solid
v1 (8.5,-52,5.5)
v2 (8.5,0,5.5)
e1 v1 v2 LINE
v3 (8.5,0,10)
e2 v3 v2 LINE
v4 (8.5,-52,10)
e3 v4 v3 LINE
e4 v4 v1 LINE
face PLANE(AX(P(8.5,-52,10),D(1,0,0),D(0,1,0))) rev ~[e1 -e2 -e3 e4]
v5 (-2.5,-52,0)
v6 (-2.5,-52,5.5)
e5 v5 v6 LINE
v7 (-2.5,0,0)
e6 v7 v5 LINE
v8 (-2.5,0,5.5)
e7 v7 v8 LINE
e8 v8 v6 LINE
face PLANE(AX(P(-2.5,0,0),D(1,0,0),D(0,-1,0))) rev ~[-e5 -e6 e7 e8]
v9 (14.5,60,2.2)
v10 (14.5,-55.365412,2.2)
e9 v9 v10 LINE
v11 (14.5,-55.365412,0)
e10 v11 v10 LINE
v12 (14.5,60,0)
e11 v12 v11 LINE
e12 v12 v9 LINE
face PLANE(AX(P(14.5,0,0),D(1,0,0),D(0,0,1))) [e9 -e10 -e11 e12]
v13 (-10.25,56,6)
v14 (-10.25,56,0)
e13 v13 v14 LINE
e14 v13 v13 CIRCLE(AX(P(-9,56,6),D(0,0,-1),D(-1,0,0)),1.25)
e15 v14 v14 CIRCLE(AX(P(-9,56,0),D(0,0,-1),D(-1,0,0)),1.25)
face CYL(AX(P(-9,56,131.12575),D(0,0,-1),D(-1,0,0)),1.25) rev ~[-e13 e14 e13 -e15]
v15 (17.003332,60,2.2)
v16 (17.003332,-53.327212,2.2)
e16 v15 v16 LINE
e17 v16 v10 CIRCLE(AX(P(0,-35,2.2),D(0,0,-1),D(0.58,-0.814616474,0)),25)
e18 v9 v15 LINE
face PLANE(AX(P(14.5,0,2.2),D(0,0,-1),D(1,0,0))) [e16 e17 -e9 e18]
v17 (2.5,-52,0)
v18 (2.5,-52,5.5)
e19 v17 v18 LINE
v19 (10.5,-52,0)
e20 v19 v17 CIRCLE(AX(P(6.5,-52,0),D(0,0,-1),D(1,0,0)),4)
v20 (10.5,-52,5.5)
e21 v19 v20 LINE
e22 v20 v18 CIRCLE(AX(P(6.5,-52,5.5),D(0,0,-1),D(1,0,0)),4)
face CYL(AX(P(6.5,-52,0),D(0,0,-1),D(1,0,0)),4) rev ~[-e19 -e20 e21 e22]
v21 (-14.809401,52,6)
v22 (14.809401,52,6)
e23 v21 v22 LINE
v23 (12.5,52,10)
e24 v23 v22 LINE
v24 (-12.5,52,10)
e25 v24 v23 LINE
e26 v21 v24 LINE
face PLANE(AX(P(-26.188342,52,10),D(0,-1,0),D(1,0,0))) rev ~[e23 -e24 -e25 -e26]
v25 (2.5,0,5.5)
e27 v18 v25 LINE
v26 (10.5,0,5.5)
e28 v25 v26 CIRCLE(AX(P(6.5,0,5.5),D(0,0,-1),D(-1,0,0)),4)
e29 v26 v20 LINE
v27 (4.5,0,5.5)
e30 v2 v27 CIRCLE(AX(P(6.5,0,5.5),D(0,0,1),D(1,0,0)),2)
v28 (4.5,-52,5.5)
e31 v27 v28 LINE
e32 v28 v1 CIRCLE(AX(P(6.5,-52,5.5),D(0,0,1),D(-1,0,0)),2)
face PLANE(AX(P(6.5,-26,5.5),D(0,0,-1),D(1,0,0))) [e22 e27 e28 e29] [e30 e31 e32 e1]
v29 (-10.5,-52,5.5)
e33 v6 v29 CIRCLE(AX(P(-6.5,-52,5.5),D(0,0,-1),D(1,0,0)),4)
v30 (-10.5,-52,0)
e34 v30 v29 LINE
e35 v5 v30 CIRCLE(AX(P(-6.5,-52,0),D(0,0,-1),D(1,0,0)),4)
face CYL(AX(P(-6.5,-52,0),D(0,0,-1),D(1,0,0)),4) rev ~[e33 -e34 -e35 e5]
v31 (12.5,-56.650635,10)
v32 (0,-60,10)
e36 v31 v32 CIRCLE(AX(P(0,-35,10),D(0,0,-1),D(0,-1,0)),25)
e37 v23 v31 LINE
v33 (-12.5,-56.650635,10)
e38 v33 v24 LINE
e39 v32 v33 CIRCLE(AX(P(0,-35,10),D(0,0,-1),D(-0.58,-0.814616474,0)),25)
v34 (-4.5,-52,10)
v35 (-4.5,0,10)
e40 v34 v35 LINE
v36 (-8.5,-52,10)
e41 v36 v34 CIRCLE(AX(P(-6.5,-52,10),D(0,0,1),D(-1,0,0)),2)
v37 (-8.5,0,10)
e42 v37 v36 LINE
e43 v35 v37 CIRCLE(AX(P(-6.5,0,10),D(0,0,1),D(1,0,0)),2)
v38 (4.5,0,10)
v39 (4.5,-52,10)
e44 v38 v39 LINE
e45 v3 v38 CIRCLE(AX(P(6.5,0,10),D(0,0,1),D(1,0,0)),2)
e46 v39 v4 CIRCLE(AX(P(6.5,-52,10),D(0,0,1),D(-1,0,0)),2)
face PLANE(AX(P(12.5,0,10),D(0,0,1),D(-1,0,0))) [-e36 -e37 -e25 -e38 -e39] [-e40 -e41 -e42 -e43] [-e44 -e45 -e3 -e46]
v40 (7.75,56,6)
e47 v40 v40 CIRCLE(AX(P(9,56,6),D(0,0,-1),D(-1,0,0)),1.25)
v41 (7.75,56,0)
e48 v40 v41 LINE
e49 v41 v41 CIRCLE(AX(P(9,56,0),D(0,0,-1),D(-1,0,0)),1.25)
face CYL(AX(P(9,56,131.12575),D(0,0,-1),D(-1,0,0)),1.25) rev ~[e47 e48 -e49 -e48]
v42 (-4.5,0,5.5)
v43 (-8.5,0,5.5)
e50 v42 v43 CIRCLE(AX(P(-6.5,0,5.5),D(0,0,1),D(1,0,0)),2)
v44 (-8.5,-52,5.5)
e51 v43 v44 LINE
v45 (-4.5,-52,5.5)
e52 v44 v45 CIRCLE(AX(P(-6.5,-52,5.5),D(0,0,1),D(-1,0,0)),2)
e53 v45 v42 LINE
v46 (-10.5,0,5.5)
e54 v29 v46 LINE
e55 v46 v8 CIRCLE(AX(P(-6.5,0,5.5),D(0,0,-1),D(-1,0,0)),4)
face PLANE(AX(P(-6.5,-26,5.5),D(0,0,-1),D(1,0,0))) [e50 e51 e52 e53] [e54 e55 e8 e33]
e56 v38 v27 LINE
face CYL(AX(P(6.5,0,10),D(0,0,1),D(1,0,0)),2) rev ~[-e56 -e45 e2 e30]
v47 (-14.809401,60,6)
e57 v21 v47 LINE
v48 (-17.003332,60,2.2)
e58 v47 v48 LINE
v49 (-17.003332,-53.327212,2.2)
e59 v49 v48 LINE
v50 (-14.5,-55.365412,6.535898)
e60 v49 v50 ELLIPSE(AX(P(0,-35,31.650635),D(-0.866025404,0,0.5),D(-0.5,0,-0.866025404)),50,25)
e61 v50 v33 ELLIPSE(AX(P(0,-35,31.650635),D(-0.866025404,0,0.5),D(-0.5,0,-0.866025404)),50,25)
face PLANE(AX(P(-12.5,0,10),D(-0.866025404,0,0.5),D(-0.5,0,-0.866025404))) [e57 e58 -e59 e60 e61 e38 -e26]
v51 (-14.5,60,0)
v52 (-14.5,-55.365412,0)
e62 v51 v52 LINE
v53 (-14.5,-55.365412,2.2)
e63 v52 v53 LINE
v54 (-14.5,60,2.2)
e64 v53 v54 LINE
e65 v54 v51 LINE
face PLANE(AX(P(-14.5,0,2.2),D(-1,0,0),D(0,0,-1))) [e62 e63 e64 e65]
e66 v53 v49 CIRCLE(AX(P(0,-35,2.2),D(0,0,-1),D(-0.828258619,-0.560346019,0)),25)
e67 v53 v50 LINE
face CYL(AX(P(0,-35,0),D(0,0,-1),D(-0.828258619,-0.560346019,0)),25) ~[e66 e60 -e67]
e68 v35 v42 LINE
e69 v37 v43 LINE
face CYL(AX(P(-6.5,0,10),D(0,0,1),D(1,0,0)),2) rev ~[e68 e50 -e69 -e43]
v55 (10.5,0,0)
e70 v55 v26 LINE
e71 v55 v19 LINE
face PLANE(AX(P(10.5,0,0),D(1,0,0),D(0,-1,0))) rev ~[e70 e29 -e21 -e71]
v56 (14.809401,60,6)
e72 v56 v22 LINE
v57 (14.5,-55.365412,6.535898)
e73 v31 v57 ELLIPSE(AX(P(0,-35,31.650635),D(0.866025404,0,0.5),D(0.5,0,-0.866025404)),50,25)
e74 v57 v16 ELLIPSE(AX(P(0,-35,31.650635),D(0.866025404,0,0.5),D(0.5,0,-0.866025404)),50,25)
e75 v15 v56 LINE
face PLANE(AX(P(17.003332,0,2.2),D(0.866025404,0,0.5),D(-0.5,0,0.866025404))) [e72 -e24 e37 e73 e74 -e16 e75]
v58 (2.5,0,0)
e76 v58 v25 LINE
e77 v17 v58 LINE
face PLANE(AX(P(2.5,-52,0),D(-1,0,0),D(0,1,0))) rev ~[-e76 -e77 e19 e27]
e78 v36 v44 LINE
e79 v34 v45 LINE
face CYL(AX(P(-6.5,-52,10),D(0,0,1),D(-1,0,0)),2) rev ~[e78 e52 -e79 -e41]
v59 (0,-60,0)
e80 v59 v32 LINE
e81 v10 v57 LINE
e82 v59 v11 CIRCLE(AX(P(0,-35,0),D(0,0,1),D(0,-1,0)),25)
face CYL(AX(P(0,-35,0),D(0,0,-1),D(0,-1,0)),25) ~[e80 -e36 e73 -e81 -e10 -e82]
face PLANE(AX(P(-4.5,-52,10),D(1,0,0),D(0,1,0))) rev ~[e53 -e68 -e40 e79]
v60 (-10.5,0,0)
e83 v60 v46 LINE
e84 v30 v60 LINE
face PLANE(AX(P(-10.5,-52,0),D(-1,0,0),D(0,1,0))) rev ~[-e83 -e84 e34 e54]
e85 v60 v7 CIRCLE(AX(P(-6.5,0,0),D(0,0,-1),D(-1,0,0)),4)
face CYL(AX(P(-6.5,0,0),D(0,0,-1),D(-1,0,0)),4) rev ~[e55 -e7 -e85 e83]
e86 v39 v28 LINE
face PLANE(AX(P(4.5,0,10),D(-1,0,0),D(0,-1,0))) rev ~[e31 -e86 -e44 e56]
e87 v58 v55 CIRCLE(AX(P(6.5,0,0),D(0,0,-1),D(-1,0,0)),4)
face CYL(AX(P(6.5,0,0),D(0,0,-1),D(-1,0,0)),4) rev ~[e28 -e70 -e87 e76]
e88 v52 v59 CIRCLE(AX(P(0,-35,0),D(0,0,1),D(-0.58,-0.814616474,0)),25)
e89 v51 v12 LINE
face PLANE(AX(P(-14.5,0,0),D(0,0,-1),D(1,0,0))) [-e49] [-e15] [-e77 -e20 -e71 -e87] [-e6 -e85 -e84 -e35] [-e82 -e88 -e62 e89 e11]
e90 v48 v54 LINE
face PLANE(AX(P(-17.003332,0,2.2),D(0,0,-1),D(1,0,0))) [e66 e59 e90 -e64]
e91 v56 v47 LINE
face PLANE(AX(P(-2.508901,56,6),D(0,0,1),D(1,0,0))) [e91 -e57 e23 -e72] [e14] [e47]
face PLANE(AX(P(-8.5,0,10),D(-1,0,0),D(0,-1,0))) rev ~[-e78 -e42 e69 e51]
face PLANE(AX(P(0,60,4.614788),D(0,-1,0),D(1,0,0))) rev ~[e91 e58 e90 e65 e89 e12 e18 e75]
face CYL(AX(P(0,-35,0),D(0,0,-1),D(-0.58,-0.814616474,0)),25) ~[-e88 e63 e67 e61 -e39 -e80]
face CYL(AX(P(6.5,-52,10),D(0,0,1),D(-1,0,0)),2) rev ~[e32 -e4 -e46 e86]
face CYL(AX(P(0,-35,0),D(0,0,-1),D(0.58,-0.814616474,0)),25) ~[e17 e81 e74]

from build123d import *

# Parameters (mm, degrees)
F1_DEPTH = 60
F3_DEPTH = 25
F5_DEPTH = 5.5
F7_DEPTH = 25
F9_DEPTH = 4
F11_D    = 2.5


with BuildPart() as f1:
    # F0 (on Front) → F1 (new body, symmetric)
    with BuildSketch(Plane.XZ):
        Polygon((-14.5, 2.2), (-14.5, 0), (14.5, 0), (14.5, 2.2), (17.0033320997, 2.2), (12.5, 10), (-12.5, 10), (-17.0033320997, 2.2), align=None)
    extrude(amount=F1_DEPTH, both=True)

    # F2 (on face) → F3 (cut)
    with BuildSketch(Plane.XY.offset(10)):
        with BuildLine():
            ThreePointArc((-4.5, 0), (-6.5, 2), (-8.5, 0))
            Line((-8.5, 0), (-8.5, -52))
            ThreePointArc((-8.5, -52), (-6.5, -54), (-4.5, -52))
            Line((-4.5, -52), (-4.5, 0))
        make_face()
        with BuildLine():
            ThreePointArc((8.5, 0), (6.5, 2), (4.5, 0))
            Line((4.5, 0), (4.5, -52))
            ThreePointArc((4.5, -52), (6.5, -54), (8.5, -52))
            Line((8.5, -52), (8.5, 0))
        make_face()
    extrude(amount=-F3_DEPTH, mode=Mode.SUBTRACT)

    # F4 (on face) → F5 (cut)
    with BuildSketch(Plane(origin=(0, 0, 0), x_dir=(1, 0, 0), z_dir=(0, 0, -1))):
        with BuildLine():
            ThreePointArc((-10.5, 0), (-6.5, -4), (-2.5, 0))
            Line((-2.5, 0), (-2.5, 52))
            ThreePointArc((-2.5, 52), (-6.5, 56), (-10.5, 52))
            Line((-10.5, 52), (-10.5, 0))
        make_face()
        with BuildLine():
            ThreePointArc((-4.5, 0), (-6.5, -2), (-8.5, 0))
            Line((-8.5, 0), (-8.5, 52))
            ThreePointArc((-8.5, 52), (-6.5, 54), (-4.5, 52))
            Line((-4.5, 52), (-4.5, 0))
        make_face(mode=Mode.SUBTRACT)
        with BuildLine():
            ThreePointArc((2.5, 0), (6.5, -4), (10.5, 0))
            Line((10.5, 0), (10.5, 52))
            ThreePointArc((10.5, 52), (6.5, 56), (2.5, 52))
            Line((2.5, 52), (2.5, 0))
        make_face()
        with BuildLine():
            ThreePointArc((4.5, 52), (6.5, 54), (8.5, 52))
            Line((8.5, 52), (8.5, 0))
            ThreePointArc((8.5, 0), (6.5, -2), (4.5, 0))
            Line((4.5, 0), (4.5, 52))
        make_face(mode=Mode.SUBTRACT)
    extrude(amount=-F5_DEPTH, mode=Mode.SUBTRACT)

    # F6 (on face) → F7 (cut)
    with BuildSketch(Plane(origin=(0, 0, 0), x_dir=(1, 0, 0), z_dir=(0, 0, -1))):
        with BuildLine():
            ThreePointArc((0, 60), (7.6113304895, 58.8131822355), (14.5, 55.3654118544))
            Line((14.5, 55.3654118544), (14.5, 60))
            Line((14.5, 60), (0, 60))
        make_face()
        with BuildLine():
            ThreePointArc((-14.5, 55.3654118544), (-7.6113304895, 58.8131822355), (0, 60))
            Line((0, 60), (-14.5, 60))
            Line((-14.5, 60), (-14.5, 55.3654118544))
        make_face()
        with BuildLine():
            ThreePointArc((14.5, 55.3654118544), (18.1961519016, 52.1435135248), (21.1923439056, 48.2621476311))
            Line((21.1923439056, 48.2621476311), (21.1923439056, 66.2593638897))
            Line((21.1923439056, 66.2593638897), (-20.7064654678, 66.2593638897))
            Line((-20.7064654678, 66.2593638897), (-20.7064654678, 49.0086504643))
            ThreePointArc((-20.7064654678, 49.0086504643), (-17.8878703743, 52.4649389771), (-14.5, 55.3654118544))
            Line((-14.5, 55.3654118544), (-14.5, 60))
            Line((-14.5, 60), (0, 60))
            Line((0, 60), (14.5, 60))
            Line((14.5, 60), (14.5, 55.3654118544))
        make_face()
    extrude(amount=-F7_DEPTH, mode=Mode.SUBTRACT)

    # F8 (on face) → F9 (cut)
    with BuildSketch(Plane.XY.offset(10)):
        Polygon((12.5, 60), (-12.5, 60), (-26.1883419007, 60), (-26.1883419007, 52), (21.1705399538, 52), (21.1705399538, 60), align=None)
    extrude(amount=-F9_DEPTH, mode=Mode.SUBTRACT)

    # F11 (through all)
    with Locations(Plane.XY.offset(6)):
        with Locations((9, 56), (-9, 56)):
            Hole(F11_D / 2)


solid = f1.part
